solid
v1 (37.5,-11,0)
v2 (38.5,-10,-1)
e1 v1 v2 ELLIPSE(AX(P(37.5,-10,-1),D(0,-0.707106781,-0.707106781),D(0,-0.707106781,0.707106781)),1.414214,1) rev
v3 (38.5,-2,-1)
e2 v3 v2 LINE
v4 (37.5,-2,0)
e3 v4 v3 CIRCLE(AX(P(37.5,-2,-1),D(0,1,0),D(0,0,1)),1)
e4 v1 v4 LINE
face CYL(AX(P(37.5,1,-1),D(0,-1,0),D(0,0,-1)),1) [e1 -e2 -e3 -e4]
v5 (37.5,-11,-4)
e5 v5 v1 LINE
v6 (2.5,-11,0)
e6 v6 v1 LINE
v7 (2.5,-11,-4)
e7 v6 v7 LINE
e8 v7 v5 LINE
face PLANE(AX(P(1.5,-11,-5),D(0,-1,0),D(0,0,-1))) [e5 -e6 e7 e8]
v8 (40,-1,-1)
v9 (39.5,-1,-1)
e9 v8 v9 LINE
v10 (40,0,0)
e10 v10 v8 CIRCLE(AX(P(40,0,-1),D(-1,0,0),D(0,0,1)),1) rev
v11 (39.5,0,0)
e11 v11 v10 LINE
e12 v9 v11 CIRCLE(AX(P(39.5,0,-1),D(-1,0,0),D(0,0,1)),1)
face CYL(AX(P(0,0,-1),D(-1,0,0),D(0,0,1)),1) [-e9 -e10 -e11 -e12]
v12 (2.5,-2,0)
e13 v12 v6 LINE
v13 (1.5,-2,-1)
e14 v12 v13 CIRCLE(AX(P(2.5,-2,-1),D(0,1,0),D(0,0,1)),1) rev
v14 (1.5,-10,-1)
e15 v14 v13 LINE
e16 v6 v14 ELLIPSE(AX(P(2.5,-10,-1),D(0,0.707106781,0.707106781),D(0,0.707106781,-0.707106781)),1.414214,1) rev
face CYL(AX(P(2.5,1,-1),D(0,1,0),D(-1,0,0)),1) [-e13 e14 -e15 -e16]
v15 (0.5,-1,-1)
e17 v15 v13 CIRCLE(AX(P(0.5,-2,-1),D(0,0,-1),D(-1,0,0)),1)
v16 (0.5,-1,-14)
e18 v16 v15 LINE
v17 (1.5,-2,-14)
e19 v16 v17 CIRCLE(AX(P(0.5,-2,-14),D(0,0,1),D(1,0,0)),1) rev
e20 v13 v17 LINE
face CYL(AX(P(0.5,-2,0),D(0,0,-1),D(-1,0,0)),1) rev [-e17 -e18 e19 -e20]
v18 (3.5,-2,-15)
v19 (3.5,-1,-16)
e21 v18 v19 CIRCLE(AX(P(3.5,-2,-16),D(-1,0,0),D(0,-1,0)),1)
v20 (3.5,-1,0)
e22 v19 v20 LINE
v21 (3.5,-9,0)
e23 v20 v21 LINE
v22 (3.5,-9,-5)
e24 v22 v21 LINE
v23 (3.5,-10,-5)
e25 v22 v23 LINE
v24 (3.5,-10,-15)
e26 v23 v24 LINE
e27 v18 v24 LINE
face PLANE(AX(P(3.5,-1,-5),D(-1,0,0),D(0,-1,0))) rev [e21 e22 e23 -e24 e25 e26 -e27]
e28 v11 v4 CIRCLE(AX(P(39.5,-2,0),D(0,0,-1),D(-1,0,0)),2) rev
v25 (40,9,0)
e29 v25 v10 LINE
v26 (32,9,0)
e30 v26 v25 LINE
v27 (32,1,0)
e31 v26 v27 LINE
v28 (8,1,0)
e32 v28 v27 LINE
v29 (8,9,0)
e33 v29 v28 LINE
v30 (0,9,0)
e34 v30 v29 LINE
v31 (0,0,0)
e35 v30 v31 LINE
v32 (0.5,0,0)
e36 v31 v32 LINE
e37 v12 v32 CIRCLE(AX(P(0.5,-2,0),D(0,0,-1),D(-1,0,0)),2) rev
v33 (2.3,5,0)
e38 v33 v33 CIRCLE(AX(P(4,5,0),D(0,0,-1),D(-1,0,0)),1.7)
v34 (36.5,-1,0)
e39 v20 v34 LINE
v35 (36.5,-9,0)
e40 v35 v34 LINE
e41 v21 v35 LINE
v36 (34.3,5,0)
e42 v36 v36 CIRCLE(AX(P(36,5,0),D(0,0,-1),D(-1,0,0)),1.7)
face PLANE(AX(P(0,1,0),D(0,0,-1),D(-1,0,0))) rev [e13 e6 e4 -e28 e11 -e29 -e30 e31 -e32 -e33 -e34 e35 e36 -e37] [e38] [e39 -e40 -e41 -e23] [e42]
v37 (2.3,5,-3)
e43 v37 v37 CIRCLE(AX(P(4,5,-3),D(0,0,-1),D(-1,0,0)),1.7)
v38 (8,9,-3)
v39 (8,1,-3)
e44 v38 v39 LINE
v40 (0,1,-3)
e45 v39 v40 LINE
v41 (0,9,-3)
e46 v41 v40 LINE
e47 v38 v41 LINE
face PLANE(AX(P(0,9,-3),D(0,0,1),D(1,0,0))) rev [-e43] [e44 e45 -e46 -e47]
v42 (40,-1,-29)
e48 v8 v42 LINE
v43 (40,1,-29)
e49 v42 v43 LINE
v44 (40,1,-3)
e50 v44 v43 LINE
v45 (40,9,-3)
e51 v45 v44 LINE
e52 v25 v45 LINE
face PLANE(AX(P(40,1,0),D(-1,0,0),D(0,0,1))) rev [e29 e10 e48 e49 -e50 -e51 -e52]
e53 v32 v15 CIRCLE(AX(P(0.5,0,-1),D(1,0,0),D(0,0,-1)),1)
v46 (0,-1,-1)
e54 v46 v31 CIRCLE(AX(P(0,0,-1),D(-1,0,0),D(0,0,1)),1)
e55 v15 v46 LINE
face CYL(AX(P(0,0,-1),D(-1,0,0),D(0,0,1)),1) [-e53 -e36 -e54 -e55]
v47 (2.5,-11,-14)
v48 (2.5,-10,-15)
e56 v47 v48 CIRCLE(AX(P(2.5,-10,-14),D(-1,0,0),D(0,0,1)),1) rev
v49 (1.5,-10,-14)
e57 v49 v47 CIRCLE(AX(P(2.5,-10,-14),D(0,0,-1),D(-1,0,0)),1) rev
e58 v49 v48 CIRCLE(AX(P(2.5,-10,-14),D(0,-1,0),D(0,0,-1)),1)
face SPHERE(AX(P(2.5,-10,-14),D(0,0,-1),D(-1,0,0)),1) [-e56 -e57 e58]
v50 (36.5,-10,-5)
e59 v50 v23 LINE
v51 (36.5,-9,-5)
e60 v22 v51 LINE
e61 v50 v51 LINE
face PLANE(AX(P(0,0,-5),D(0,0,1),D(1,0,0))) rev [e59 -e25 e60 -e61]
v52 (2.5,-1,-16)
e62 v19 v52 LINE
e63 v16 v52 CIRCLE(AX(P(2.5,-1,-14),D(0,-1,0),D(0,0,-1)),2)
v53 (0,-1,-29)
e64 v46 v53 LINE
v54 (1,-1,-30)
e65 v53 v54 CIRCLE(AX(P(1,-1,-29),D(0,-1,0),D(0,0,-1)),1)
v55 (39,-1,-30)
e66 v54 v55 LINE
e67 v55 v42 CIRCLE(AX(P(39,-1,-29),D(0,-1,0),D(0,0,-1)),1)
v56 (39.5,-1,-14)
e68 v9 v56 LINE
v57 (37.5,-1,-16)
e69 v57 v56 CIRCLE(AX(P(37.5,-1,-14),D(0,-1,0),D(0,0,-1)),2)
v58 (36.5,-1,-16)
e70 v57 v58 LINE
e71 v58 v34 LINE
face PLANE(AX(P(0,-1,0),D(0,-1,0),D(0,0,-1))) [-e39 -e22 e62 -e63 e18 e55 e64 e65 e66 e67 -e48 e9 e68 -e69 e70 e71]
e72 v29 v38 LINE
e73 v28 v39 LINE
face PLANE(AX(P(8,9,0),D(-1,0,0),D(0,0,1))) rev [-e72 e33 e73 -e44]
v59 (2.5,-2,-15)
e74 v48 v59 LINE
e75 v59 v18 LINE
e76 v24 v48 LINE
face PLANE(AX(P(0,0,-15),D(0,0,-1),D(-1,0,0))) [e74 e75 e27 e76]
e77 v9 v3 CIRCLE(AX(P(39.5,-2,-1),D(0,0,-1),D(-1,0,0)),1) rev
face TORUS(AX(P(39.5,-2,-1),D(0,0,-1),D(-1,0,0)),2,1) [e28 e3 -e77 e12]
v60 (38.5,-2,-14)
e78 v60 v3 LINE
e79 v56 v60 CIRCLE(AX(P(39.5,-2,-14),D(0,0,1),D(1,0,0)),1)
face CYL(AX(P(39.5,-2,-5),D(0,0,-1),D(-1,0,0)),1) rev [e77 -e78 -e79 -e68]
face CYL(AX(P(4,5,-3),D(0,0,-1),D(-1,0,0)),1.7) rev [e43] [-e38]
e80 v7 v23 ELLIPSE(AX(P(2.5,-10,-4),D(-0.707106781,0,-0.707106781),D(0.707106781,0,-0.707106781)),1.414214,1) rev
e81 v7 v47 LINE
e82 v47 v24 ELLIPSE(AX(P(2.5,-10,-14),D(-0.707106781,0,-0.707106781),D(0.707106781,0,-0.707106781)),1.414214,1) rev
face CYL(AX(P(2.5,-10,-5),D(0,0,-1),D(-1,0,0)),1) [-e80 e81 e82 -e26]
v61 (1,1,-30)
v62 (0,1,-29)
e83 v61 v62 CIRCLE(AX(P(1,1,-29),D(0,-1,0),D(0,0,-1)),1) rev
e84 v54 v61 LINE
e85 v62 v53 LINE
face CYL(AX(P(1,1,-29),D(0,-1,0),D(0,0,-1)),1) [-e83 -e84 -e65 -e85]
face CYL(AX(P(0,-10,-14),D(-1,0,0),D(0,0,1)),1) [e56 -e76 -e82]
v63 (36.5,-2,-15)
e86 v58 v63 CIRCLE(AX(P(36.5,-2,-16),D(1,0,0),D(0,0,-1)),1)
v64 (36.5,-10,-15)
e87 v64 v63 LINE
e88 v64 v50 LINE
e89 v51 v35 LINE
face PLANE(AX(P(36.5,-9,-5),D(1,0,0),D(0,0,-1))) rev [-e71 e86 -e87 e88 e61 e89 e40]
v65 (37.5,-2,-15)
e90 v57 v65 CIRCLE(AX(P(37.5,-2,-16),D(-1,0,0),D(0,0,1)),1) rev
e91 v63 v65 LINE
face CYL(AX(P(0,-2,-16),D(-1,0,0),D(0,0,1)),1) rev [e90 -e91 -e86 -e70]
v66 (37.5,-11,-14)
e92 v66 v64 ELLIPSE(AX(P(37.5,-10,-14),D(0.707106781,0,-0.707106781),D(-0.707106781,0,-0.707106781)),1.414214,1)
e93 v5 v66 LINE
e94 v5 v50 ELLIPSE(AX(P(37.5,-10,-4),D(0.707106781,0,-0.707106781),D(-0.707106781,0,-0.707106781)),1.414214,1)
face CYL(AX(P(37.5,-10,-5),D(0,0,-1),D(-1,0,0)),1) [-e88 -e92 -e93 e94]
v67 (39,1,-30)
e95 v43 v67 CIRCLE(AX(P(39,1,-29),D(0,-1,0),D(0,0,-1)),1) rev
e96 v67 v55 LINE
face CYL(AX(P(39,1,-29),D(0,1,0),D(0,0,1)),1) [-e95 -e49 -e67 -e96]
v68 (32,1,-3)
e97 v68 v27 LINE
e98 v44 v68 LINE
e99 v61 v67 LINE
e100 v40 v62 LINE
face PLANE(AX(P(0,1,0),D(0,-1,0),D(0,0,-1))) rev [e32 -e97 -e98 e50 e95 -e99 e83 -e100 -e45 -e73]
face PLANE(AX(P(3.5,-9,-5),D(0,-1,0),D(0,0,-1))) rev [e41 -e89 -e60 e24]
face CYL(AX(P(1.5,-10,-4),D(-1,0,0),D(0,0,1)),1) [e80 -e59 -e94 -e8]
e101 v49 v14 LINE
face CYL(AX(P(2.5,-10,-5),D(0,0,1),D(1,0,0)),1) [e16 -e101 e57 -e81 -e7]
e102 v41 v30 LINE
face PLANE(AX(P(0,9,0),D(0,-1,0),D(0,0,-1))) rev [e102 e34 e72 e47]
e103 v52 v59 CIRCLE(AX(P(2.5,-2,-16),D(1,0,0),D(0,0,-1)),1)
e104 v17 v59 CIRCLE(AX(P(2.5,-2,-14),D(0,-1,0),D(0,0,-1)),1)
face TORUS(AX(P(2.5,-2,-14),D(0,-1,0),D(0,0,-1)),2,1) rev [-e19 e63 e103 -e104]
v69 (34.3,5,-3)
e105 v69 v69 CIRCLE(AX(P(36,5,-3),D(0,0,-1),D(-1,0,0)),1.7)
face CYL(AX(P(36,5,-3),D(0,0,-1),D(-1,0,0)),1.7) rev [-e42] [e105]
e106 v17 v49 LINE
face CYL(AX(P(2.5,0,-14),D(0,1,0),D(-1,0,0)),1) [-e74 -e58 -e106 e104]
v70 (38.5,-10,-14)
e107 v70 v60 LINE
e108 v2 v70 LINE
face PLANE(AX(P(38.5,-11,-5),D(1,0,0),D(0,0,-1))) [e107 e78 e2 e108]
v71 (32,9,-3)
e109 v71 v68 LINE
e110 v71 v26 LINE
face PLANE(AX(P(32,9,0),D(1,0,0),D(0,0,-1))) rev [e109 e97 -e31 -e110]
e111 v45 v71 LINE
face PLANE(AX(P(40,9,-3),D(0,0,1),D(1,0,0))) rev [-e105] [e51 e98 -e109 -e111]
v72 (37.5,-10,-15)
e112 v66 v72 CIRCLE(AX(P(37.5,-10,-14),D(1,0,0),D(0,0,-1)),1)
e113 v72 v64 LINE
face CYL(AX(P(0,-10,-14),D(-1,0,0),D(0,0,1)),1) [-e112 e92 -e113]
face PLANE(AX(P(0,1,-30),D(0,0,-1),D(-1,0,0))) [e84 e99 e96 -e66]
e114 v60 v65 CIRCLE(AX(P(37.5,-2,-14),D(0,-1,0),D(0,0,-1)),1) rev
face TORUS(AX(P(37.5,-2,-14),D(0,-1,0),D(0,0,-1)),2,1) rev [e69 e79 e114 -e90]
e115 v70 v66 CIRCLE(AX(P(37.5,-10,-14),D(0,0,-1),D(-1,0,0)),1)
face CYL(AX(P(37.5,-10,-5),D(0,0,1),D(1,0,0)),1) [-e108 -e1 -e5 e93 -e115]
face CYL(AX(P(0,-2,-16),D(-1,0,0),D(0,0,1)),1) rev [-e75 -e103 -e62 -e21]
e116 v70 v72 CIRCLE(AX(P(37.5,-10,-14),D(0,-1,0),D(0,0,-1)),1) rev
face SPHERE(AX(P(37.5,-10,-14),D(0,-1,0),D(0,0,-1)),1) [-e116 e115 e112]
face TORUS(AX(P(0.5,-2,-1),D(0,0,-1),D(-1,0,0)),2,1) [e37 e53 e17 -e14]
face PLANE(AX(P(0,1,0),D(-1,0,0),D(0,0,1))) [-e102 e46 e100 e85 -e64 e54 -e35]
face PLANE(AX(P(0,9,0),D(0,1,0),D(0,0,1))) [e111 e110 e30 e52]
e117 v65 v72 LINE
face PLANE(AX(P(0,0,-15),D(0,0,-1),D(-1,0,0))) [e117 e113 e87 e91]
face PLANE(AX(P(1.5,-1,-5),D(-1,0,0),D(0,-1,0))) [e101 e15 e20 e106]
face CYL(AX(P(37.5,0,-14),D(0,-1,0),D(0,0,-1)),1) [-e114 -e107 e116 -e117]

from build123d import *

# Parameters (mm, degrees)
SKETCH1_W            = 40
SKETCH1_H            = 30
BOSS_EXTRUDE1_DEPTH  = 1
SKETCH2_W            = 8
SKETCH2_H            = 3
BOSS_EXTRUDE2_DEPTH  = 8
M3_CLEARANCE_HOLE1_D = 3.4
BOSS_EXTRUDE3_DEPTH  = 5
SKETCH8_W            = 2
SKETCH8_H            = 10
BOSS_EXTRUDE4_DEPTH  = 10
FILLET1_R            = 1


with BuildPart() as part:
    # Sketch1 → Boss-Extrude1 (new, symmetric)
    with BuildSketch(Plane(origin=(0, 0, 0), x_dir=(1, 0, 0), z_dir=(0, 1, 0))):
        with Locations((20, 15)):
            Rectangle(SKETCH1_W, SKETCH1_H)
    extrude(amount=BOSS_EXTRUDE1_DEPTH, both=True)

    # Sketch2 → Boss-Extrude2 (add)
    with BuildSketch(Plane(origin=(0, 1, 0), x_dir=(1, 0, 0), z_dir=(0, 1, 0))):
        with Locations((4, 1.5)):
            Rectangle(SKETCH2_W, SKETCH2_H)
        with Locations((36, 1.5)):
            Rectangle(SKETCH2_W, SKETCH2_H)
    extrude(amount=BOSS_EXTRUDE2_DEPTH)

    # M3 Clearance Hole1 (through all)
    with Locations(Plane(origin=(0, 0, -3), x_dir=(-1, 0, 0), z_dir=(0, 0, -1))):
        with Locations((-4, 5), (-36, 5)):
            Hole(M3_CLEARANCE_HOLE1_D / 2)

    # Sketch7 → Boss-Extrude3 (add)
    with BuildSketch(Plane.XY):
        Polygon((1.5, -1), (1.5, -11), (38.5, -11), (38.5, -1), (36.5, -1), (36.5, -9), (3.5, -9), (3.5, -1), align=None)
    extrude(amount=-BOSS_EXTRUDE3_DEPTH)

    # Sketch8 → Boss-Extrude4 (add)
    with BuildSketch(Plane(origin=(0, 0, -5), x_dir=(-1, 0, 0), z_dir=(0, 0, -1))):
        with Locations((-37.5, -6)):
            Rectangle(SKETCH8_W, SKETCH8_H)
        with Locations((-2.5, -6)):
            Rectangle(SKETCH8_W, SKETCH8_H)
    extrude(amount=BOSS_EXTRUDE4_DEPTH)

    # Fillet1
    fillet1_edges = [part.edges().sort_by_distance(p)[0] for p in [
        (3.5, -11, -10),
        (2.5, -11, -15),
        (1.5, -6, -15),
        (2.5, -1, -15),
        (0.75, -1, 0),
        (39.25, -1, 0),
        (38.5, -1, -7.5),
        (38.5, -11, -7.5),
        (1.5, -11, -7.5),
        (1.5, -1, -7.5),
        (1.5, -6, 0),
        (38.5, -6, 0),
        (40, 0, -30),
        (0, 0, -30),
        (36.5, -11, -10),
        (38.5, -6, -15),
        (37.5, -11, -15),
        (37.5, -1, -15),
        (20, -11, -5),
    ]]
    fillet(fillet1_edges, radius=FILLET1_R - 0.0001)  # a hair under: the kernel refuses the full size


solid = part.part
